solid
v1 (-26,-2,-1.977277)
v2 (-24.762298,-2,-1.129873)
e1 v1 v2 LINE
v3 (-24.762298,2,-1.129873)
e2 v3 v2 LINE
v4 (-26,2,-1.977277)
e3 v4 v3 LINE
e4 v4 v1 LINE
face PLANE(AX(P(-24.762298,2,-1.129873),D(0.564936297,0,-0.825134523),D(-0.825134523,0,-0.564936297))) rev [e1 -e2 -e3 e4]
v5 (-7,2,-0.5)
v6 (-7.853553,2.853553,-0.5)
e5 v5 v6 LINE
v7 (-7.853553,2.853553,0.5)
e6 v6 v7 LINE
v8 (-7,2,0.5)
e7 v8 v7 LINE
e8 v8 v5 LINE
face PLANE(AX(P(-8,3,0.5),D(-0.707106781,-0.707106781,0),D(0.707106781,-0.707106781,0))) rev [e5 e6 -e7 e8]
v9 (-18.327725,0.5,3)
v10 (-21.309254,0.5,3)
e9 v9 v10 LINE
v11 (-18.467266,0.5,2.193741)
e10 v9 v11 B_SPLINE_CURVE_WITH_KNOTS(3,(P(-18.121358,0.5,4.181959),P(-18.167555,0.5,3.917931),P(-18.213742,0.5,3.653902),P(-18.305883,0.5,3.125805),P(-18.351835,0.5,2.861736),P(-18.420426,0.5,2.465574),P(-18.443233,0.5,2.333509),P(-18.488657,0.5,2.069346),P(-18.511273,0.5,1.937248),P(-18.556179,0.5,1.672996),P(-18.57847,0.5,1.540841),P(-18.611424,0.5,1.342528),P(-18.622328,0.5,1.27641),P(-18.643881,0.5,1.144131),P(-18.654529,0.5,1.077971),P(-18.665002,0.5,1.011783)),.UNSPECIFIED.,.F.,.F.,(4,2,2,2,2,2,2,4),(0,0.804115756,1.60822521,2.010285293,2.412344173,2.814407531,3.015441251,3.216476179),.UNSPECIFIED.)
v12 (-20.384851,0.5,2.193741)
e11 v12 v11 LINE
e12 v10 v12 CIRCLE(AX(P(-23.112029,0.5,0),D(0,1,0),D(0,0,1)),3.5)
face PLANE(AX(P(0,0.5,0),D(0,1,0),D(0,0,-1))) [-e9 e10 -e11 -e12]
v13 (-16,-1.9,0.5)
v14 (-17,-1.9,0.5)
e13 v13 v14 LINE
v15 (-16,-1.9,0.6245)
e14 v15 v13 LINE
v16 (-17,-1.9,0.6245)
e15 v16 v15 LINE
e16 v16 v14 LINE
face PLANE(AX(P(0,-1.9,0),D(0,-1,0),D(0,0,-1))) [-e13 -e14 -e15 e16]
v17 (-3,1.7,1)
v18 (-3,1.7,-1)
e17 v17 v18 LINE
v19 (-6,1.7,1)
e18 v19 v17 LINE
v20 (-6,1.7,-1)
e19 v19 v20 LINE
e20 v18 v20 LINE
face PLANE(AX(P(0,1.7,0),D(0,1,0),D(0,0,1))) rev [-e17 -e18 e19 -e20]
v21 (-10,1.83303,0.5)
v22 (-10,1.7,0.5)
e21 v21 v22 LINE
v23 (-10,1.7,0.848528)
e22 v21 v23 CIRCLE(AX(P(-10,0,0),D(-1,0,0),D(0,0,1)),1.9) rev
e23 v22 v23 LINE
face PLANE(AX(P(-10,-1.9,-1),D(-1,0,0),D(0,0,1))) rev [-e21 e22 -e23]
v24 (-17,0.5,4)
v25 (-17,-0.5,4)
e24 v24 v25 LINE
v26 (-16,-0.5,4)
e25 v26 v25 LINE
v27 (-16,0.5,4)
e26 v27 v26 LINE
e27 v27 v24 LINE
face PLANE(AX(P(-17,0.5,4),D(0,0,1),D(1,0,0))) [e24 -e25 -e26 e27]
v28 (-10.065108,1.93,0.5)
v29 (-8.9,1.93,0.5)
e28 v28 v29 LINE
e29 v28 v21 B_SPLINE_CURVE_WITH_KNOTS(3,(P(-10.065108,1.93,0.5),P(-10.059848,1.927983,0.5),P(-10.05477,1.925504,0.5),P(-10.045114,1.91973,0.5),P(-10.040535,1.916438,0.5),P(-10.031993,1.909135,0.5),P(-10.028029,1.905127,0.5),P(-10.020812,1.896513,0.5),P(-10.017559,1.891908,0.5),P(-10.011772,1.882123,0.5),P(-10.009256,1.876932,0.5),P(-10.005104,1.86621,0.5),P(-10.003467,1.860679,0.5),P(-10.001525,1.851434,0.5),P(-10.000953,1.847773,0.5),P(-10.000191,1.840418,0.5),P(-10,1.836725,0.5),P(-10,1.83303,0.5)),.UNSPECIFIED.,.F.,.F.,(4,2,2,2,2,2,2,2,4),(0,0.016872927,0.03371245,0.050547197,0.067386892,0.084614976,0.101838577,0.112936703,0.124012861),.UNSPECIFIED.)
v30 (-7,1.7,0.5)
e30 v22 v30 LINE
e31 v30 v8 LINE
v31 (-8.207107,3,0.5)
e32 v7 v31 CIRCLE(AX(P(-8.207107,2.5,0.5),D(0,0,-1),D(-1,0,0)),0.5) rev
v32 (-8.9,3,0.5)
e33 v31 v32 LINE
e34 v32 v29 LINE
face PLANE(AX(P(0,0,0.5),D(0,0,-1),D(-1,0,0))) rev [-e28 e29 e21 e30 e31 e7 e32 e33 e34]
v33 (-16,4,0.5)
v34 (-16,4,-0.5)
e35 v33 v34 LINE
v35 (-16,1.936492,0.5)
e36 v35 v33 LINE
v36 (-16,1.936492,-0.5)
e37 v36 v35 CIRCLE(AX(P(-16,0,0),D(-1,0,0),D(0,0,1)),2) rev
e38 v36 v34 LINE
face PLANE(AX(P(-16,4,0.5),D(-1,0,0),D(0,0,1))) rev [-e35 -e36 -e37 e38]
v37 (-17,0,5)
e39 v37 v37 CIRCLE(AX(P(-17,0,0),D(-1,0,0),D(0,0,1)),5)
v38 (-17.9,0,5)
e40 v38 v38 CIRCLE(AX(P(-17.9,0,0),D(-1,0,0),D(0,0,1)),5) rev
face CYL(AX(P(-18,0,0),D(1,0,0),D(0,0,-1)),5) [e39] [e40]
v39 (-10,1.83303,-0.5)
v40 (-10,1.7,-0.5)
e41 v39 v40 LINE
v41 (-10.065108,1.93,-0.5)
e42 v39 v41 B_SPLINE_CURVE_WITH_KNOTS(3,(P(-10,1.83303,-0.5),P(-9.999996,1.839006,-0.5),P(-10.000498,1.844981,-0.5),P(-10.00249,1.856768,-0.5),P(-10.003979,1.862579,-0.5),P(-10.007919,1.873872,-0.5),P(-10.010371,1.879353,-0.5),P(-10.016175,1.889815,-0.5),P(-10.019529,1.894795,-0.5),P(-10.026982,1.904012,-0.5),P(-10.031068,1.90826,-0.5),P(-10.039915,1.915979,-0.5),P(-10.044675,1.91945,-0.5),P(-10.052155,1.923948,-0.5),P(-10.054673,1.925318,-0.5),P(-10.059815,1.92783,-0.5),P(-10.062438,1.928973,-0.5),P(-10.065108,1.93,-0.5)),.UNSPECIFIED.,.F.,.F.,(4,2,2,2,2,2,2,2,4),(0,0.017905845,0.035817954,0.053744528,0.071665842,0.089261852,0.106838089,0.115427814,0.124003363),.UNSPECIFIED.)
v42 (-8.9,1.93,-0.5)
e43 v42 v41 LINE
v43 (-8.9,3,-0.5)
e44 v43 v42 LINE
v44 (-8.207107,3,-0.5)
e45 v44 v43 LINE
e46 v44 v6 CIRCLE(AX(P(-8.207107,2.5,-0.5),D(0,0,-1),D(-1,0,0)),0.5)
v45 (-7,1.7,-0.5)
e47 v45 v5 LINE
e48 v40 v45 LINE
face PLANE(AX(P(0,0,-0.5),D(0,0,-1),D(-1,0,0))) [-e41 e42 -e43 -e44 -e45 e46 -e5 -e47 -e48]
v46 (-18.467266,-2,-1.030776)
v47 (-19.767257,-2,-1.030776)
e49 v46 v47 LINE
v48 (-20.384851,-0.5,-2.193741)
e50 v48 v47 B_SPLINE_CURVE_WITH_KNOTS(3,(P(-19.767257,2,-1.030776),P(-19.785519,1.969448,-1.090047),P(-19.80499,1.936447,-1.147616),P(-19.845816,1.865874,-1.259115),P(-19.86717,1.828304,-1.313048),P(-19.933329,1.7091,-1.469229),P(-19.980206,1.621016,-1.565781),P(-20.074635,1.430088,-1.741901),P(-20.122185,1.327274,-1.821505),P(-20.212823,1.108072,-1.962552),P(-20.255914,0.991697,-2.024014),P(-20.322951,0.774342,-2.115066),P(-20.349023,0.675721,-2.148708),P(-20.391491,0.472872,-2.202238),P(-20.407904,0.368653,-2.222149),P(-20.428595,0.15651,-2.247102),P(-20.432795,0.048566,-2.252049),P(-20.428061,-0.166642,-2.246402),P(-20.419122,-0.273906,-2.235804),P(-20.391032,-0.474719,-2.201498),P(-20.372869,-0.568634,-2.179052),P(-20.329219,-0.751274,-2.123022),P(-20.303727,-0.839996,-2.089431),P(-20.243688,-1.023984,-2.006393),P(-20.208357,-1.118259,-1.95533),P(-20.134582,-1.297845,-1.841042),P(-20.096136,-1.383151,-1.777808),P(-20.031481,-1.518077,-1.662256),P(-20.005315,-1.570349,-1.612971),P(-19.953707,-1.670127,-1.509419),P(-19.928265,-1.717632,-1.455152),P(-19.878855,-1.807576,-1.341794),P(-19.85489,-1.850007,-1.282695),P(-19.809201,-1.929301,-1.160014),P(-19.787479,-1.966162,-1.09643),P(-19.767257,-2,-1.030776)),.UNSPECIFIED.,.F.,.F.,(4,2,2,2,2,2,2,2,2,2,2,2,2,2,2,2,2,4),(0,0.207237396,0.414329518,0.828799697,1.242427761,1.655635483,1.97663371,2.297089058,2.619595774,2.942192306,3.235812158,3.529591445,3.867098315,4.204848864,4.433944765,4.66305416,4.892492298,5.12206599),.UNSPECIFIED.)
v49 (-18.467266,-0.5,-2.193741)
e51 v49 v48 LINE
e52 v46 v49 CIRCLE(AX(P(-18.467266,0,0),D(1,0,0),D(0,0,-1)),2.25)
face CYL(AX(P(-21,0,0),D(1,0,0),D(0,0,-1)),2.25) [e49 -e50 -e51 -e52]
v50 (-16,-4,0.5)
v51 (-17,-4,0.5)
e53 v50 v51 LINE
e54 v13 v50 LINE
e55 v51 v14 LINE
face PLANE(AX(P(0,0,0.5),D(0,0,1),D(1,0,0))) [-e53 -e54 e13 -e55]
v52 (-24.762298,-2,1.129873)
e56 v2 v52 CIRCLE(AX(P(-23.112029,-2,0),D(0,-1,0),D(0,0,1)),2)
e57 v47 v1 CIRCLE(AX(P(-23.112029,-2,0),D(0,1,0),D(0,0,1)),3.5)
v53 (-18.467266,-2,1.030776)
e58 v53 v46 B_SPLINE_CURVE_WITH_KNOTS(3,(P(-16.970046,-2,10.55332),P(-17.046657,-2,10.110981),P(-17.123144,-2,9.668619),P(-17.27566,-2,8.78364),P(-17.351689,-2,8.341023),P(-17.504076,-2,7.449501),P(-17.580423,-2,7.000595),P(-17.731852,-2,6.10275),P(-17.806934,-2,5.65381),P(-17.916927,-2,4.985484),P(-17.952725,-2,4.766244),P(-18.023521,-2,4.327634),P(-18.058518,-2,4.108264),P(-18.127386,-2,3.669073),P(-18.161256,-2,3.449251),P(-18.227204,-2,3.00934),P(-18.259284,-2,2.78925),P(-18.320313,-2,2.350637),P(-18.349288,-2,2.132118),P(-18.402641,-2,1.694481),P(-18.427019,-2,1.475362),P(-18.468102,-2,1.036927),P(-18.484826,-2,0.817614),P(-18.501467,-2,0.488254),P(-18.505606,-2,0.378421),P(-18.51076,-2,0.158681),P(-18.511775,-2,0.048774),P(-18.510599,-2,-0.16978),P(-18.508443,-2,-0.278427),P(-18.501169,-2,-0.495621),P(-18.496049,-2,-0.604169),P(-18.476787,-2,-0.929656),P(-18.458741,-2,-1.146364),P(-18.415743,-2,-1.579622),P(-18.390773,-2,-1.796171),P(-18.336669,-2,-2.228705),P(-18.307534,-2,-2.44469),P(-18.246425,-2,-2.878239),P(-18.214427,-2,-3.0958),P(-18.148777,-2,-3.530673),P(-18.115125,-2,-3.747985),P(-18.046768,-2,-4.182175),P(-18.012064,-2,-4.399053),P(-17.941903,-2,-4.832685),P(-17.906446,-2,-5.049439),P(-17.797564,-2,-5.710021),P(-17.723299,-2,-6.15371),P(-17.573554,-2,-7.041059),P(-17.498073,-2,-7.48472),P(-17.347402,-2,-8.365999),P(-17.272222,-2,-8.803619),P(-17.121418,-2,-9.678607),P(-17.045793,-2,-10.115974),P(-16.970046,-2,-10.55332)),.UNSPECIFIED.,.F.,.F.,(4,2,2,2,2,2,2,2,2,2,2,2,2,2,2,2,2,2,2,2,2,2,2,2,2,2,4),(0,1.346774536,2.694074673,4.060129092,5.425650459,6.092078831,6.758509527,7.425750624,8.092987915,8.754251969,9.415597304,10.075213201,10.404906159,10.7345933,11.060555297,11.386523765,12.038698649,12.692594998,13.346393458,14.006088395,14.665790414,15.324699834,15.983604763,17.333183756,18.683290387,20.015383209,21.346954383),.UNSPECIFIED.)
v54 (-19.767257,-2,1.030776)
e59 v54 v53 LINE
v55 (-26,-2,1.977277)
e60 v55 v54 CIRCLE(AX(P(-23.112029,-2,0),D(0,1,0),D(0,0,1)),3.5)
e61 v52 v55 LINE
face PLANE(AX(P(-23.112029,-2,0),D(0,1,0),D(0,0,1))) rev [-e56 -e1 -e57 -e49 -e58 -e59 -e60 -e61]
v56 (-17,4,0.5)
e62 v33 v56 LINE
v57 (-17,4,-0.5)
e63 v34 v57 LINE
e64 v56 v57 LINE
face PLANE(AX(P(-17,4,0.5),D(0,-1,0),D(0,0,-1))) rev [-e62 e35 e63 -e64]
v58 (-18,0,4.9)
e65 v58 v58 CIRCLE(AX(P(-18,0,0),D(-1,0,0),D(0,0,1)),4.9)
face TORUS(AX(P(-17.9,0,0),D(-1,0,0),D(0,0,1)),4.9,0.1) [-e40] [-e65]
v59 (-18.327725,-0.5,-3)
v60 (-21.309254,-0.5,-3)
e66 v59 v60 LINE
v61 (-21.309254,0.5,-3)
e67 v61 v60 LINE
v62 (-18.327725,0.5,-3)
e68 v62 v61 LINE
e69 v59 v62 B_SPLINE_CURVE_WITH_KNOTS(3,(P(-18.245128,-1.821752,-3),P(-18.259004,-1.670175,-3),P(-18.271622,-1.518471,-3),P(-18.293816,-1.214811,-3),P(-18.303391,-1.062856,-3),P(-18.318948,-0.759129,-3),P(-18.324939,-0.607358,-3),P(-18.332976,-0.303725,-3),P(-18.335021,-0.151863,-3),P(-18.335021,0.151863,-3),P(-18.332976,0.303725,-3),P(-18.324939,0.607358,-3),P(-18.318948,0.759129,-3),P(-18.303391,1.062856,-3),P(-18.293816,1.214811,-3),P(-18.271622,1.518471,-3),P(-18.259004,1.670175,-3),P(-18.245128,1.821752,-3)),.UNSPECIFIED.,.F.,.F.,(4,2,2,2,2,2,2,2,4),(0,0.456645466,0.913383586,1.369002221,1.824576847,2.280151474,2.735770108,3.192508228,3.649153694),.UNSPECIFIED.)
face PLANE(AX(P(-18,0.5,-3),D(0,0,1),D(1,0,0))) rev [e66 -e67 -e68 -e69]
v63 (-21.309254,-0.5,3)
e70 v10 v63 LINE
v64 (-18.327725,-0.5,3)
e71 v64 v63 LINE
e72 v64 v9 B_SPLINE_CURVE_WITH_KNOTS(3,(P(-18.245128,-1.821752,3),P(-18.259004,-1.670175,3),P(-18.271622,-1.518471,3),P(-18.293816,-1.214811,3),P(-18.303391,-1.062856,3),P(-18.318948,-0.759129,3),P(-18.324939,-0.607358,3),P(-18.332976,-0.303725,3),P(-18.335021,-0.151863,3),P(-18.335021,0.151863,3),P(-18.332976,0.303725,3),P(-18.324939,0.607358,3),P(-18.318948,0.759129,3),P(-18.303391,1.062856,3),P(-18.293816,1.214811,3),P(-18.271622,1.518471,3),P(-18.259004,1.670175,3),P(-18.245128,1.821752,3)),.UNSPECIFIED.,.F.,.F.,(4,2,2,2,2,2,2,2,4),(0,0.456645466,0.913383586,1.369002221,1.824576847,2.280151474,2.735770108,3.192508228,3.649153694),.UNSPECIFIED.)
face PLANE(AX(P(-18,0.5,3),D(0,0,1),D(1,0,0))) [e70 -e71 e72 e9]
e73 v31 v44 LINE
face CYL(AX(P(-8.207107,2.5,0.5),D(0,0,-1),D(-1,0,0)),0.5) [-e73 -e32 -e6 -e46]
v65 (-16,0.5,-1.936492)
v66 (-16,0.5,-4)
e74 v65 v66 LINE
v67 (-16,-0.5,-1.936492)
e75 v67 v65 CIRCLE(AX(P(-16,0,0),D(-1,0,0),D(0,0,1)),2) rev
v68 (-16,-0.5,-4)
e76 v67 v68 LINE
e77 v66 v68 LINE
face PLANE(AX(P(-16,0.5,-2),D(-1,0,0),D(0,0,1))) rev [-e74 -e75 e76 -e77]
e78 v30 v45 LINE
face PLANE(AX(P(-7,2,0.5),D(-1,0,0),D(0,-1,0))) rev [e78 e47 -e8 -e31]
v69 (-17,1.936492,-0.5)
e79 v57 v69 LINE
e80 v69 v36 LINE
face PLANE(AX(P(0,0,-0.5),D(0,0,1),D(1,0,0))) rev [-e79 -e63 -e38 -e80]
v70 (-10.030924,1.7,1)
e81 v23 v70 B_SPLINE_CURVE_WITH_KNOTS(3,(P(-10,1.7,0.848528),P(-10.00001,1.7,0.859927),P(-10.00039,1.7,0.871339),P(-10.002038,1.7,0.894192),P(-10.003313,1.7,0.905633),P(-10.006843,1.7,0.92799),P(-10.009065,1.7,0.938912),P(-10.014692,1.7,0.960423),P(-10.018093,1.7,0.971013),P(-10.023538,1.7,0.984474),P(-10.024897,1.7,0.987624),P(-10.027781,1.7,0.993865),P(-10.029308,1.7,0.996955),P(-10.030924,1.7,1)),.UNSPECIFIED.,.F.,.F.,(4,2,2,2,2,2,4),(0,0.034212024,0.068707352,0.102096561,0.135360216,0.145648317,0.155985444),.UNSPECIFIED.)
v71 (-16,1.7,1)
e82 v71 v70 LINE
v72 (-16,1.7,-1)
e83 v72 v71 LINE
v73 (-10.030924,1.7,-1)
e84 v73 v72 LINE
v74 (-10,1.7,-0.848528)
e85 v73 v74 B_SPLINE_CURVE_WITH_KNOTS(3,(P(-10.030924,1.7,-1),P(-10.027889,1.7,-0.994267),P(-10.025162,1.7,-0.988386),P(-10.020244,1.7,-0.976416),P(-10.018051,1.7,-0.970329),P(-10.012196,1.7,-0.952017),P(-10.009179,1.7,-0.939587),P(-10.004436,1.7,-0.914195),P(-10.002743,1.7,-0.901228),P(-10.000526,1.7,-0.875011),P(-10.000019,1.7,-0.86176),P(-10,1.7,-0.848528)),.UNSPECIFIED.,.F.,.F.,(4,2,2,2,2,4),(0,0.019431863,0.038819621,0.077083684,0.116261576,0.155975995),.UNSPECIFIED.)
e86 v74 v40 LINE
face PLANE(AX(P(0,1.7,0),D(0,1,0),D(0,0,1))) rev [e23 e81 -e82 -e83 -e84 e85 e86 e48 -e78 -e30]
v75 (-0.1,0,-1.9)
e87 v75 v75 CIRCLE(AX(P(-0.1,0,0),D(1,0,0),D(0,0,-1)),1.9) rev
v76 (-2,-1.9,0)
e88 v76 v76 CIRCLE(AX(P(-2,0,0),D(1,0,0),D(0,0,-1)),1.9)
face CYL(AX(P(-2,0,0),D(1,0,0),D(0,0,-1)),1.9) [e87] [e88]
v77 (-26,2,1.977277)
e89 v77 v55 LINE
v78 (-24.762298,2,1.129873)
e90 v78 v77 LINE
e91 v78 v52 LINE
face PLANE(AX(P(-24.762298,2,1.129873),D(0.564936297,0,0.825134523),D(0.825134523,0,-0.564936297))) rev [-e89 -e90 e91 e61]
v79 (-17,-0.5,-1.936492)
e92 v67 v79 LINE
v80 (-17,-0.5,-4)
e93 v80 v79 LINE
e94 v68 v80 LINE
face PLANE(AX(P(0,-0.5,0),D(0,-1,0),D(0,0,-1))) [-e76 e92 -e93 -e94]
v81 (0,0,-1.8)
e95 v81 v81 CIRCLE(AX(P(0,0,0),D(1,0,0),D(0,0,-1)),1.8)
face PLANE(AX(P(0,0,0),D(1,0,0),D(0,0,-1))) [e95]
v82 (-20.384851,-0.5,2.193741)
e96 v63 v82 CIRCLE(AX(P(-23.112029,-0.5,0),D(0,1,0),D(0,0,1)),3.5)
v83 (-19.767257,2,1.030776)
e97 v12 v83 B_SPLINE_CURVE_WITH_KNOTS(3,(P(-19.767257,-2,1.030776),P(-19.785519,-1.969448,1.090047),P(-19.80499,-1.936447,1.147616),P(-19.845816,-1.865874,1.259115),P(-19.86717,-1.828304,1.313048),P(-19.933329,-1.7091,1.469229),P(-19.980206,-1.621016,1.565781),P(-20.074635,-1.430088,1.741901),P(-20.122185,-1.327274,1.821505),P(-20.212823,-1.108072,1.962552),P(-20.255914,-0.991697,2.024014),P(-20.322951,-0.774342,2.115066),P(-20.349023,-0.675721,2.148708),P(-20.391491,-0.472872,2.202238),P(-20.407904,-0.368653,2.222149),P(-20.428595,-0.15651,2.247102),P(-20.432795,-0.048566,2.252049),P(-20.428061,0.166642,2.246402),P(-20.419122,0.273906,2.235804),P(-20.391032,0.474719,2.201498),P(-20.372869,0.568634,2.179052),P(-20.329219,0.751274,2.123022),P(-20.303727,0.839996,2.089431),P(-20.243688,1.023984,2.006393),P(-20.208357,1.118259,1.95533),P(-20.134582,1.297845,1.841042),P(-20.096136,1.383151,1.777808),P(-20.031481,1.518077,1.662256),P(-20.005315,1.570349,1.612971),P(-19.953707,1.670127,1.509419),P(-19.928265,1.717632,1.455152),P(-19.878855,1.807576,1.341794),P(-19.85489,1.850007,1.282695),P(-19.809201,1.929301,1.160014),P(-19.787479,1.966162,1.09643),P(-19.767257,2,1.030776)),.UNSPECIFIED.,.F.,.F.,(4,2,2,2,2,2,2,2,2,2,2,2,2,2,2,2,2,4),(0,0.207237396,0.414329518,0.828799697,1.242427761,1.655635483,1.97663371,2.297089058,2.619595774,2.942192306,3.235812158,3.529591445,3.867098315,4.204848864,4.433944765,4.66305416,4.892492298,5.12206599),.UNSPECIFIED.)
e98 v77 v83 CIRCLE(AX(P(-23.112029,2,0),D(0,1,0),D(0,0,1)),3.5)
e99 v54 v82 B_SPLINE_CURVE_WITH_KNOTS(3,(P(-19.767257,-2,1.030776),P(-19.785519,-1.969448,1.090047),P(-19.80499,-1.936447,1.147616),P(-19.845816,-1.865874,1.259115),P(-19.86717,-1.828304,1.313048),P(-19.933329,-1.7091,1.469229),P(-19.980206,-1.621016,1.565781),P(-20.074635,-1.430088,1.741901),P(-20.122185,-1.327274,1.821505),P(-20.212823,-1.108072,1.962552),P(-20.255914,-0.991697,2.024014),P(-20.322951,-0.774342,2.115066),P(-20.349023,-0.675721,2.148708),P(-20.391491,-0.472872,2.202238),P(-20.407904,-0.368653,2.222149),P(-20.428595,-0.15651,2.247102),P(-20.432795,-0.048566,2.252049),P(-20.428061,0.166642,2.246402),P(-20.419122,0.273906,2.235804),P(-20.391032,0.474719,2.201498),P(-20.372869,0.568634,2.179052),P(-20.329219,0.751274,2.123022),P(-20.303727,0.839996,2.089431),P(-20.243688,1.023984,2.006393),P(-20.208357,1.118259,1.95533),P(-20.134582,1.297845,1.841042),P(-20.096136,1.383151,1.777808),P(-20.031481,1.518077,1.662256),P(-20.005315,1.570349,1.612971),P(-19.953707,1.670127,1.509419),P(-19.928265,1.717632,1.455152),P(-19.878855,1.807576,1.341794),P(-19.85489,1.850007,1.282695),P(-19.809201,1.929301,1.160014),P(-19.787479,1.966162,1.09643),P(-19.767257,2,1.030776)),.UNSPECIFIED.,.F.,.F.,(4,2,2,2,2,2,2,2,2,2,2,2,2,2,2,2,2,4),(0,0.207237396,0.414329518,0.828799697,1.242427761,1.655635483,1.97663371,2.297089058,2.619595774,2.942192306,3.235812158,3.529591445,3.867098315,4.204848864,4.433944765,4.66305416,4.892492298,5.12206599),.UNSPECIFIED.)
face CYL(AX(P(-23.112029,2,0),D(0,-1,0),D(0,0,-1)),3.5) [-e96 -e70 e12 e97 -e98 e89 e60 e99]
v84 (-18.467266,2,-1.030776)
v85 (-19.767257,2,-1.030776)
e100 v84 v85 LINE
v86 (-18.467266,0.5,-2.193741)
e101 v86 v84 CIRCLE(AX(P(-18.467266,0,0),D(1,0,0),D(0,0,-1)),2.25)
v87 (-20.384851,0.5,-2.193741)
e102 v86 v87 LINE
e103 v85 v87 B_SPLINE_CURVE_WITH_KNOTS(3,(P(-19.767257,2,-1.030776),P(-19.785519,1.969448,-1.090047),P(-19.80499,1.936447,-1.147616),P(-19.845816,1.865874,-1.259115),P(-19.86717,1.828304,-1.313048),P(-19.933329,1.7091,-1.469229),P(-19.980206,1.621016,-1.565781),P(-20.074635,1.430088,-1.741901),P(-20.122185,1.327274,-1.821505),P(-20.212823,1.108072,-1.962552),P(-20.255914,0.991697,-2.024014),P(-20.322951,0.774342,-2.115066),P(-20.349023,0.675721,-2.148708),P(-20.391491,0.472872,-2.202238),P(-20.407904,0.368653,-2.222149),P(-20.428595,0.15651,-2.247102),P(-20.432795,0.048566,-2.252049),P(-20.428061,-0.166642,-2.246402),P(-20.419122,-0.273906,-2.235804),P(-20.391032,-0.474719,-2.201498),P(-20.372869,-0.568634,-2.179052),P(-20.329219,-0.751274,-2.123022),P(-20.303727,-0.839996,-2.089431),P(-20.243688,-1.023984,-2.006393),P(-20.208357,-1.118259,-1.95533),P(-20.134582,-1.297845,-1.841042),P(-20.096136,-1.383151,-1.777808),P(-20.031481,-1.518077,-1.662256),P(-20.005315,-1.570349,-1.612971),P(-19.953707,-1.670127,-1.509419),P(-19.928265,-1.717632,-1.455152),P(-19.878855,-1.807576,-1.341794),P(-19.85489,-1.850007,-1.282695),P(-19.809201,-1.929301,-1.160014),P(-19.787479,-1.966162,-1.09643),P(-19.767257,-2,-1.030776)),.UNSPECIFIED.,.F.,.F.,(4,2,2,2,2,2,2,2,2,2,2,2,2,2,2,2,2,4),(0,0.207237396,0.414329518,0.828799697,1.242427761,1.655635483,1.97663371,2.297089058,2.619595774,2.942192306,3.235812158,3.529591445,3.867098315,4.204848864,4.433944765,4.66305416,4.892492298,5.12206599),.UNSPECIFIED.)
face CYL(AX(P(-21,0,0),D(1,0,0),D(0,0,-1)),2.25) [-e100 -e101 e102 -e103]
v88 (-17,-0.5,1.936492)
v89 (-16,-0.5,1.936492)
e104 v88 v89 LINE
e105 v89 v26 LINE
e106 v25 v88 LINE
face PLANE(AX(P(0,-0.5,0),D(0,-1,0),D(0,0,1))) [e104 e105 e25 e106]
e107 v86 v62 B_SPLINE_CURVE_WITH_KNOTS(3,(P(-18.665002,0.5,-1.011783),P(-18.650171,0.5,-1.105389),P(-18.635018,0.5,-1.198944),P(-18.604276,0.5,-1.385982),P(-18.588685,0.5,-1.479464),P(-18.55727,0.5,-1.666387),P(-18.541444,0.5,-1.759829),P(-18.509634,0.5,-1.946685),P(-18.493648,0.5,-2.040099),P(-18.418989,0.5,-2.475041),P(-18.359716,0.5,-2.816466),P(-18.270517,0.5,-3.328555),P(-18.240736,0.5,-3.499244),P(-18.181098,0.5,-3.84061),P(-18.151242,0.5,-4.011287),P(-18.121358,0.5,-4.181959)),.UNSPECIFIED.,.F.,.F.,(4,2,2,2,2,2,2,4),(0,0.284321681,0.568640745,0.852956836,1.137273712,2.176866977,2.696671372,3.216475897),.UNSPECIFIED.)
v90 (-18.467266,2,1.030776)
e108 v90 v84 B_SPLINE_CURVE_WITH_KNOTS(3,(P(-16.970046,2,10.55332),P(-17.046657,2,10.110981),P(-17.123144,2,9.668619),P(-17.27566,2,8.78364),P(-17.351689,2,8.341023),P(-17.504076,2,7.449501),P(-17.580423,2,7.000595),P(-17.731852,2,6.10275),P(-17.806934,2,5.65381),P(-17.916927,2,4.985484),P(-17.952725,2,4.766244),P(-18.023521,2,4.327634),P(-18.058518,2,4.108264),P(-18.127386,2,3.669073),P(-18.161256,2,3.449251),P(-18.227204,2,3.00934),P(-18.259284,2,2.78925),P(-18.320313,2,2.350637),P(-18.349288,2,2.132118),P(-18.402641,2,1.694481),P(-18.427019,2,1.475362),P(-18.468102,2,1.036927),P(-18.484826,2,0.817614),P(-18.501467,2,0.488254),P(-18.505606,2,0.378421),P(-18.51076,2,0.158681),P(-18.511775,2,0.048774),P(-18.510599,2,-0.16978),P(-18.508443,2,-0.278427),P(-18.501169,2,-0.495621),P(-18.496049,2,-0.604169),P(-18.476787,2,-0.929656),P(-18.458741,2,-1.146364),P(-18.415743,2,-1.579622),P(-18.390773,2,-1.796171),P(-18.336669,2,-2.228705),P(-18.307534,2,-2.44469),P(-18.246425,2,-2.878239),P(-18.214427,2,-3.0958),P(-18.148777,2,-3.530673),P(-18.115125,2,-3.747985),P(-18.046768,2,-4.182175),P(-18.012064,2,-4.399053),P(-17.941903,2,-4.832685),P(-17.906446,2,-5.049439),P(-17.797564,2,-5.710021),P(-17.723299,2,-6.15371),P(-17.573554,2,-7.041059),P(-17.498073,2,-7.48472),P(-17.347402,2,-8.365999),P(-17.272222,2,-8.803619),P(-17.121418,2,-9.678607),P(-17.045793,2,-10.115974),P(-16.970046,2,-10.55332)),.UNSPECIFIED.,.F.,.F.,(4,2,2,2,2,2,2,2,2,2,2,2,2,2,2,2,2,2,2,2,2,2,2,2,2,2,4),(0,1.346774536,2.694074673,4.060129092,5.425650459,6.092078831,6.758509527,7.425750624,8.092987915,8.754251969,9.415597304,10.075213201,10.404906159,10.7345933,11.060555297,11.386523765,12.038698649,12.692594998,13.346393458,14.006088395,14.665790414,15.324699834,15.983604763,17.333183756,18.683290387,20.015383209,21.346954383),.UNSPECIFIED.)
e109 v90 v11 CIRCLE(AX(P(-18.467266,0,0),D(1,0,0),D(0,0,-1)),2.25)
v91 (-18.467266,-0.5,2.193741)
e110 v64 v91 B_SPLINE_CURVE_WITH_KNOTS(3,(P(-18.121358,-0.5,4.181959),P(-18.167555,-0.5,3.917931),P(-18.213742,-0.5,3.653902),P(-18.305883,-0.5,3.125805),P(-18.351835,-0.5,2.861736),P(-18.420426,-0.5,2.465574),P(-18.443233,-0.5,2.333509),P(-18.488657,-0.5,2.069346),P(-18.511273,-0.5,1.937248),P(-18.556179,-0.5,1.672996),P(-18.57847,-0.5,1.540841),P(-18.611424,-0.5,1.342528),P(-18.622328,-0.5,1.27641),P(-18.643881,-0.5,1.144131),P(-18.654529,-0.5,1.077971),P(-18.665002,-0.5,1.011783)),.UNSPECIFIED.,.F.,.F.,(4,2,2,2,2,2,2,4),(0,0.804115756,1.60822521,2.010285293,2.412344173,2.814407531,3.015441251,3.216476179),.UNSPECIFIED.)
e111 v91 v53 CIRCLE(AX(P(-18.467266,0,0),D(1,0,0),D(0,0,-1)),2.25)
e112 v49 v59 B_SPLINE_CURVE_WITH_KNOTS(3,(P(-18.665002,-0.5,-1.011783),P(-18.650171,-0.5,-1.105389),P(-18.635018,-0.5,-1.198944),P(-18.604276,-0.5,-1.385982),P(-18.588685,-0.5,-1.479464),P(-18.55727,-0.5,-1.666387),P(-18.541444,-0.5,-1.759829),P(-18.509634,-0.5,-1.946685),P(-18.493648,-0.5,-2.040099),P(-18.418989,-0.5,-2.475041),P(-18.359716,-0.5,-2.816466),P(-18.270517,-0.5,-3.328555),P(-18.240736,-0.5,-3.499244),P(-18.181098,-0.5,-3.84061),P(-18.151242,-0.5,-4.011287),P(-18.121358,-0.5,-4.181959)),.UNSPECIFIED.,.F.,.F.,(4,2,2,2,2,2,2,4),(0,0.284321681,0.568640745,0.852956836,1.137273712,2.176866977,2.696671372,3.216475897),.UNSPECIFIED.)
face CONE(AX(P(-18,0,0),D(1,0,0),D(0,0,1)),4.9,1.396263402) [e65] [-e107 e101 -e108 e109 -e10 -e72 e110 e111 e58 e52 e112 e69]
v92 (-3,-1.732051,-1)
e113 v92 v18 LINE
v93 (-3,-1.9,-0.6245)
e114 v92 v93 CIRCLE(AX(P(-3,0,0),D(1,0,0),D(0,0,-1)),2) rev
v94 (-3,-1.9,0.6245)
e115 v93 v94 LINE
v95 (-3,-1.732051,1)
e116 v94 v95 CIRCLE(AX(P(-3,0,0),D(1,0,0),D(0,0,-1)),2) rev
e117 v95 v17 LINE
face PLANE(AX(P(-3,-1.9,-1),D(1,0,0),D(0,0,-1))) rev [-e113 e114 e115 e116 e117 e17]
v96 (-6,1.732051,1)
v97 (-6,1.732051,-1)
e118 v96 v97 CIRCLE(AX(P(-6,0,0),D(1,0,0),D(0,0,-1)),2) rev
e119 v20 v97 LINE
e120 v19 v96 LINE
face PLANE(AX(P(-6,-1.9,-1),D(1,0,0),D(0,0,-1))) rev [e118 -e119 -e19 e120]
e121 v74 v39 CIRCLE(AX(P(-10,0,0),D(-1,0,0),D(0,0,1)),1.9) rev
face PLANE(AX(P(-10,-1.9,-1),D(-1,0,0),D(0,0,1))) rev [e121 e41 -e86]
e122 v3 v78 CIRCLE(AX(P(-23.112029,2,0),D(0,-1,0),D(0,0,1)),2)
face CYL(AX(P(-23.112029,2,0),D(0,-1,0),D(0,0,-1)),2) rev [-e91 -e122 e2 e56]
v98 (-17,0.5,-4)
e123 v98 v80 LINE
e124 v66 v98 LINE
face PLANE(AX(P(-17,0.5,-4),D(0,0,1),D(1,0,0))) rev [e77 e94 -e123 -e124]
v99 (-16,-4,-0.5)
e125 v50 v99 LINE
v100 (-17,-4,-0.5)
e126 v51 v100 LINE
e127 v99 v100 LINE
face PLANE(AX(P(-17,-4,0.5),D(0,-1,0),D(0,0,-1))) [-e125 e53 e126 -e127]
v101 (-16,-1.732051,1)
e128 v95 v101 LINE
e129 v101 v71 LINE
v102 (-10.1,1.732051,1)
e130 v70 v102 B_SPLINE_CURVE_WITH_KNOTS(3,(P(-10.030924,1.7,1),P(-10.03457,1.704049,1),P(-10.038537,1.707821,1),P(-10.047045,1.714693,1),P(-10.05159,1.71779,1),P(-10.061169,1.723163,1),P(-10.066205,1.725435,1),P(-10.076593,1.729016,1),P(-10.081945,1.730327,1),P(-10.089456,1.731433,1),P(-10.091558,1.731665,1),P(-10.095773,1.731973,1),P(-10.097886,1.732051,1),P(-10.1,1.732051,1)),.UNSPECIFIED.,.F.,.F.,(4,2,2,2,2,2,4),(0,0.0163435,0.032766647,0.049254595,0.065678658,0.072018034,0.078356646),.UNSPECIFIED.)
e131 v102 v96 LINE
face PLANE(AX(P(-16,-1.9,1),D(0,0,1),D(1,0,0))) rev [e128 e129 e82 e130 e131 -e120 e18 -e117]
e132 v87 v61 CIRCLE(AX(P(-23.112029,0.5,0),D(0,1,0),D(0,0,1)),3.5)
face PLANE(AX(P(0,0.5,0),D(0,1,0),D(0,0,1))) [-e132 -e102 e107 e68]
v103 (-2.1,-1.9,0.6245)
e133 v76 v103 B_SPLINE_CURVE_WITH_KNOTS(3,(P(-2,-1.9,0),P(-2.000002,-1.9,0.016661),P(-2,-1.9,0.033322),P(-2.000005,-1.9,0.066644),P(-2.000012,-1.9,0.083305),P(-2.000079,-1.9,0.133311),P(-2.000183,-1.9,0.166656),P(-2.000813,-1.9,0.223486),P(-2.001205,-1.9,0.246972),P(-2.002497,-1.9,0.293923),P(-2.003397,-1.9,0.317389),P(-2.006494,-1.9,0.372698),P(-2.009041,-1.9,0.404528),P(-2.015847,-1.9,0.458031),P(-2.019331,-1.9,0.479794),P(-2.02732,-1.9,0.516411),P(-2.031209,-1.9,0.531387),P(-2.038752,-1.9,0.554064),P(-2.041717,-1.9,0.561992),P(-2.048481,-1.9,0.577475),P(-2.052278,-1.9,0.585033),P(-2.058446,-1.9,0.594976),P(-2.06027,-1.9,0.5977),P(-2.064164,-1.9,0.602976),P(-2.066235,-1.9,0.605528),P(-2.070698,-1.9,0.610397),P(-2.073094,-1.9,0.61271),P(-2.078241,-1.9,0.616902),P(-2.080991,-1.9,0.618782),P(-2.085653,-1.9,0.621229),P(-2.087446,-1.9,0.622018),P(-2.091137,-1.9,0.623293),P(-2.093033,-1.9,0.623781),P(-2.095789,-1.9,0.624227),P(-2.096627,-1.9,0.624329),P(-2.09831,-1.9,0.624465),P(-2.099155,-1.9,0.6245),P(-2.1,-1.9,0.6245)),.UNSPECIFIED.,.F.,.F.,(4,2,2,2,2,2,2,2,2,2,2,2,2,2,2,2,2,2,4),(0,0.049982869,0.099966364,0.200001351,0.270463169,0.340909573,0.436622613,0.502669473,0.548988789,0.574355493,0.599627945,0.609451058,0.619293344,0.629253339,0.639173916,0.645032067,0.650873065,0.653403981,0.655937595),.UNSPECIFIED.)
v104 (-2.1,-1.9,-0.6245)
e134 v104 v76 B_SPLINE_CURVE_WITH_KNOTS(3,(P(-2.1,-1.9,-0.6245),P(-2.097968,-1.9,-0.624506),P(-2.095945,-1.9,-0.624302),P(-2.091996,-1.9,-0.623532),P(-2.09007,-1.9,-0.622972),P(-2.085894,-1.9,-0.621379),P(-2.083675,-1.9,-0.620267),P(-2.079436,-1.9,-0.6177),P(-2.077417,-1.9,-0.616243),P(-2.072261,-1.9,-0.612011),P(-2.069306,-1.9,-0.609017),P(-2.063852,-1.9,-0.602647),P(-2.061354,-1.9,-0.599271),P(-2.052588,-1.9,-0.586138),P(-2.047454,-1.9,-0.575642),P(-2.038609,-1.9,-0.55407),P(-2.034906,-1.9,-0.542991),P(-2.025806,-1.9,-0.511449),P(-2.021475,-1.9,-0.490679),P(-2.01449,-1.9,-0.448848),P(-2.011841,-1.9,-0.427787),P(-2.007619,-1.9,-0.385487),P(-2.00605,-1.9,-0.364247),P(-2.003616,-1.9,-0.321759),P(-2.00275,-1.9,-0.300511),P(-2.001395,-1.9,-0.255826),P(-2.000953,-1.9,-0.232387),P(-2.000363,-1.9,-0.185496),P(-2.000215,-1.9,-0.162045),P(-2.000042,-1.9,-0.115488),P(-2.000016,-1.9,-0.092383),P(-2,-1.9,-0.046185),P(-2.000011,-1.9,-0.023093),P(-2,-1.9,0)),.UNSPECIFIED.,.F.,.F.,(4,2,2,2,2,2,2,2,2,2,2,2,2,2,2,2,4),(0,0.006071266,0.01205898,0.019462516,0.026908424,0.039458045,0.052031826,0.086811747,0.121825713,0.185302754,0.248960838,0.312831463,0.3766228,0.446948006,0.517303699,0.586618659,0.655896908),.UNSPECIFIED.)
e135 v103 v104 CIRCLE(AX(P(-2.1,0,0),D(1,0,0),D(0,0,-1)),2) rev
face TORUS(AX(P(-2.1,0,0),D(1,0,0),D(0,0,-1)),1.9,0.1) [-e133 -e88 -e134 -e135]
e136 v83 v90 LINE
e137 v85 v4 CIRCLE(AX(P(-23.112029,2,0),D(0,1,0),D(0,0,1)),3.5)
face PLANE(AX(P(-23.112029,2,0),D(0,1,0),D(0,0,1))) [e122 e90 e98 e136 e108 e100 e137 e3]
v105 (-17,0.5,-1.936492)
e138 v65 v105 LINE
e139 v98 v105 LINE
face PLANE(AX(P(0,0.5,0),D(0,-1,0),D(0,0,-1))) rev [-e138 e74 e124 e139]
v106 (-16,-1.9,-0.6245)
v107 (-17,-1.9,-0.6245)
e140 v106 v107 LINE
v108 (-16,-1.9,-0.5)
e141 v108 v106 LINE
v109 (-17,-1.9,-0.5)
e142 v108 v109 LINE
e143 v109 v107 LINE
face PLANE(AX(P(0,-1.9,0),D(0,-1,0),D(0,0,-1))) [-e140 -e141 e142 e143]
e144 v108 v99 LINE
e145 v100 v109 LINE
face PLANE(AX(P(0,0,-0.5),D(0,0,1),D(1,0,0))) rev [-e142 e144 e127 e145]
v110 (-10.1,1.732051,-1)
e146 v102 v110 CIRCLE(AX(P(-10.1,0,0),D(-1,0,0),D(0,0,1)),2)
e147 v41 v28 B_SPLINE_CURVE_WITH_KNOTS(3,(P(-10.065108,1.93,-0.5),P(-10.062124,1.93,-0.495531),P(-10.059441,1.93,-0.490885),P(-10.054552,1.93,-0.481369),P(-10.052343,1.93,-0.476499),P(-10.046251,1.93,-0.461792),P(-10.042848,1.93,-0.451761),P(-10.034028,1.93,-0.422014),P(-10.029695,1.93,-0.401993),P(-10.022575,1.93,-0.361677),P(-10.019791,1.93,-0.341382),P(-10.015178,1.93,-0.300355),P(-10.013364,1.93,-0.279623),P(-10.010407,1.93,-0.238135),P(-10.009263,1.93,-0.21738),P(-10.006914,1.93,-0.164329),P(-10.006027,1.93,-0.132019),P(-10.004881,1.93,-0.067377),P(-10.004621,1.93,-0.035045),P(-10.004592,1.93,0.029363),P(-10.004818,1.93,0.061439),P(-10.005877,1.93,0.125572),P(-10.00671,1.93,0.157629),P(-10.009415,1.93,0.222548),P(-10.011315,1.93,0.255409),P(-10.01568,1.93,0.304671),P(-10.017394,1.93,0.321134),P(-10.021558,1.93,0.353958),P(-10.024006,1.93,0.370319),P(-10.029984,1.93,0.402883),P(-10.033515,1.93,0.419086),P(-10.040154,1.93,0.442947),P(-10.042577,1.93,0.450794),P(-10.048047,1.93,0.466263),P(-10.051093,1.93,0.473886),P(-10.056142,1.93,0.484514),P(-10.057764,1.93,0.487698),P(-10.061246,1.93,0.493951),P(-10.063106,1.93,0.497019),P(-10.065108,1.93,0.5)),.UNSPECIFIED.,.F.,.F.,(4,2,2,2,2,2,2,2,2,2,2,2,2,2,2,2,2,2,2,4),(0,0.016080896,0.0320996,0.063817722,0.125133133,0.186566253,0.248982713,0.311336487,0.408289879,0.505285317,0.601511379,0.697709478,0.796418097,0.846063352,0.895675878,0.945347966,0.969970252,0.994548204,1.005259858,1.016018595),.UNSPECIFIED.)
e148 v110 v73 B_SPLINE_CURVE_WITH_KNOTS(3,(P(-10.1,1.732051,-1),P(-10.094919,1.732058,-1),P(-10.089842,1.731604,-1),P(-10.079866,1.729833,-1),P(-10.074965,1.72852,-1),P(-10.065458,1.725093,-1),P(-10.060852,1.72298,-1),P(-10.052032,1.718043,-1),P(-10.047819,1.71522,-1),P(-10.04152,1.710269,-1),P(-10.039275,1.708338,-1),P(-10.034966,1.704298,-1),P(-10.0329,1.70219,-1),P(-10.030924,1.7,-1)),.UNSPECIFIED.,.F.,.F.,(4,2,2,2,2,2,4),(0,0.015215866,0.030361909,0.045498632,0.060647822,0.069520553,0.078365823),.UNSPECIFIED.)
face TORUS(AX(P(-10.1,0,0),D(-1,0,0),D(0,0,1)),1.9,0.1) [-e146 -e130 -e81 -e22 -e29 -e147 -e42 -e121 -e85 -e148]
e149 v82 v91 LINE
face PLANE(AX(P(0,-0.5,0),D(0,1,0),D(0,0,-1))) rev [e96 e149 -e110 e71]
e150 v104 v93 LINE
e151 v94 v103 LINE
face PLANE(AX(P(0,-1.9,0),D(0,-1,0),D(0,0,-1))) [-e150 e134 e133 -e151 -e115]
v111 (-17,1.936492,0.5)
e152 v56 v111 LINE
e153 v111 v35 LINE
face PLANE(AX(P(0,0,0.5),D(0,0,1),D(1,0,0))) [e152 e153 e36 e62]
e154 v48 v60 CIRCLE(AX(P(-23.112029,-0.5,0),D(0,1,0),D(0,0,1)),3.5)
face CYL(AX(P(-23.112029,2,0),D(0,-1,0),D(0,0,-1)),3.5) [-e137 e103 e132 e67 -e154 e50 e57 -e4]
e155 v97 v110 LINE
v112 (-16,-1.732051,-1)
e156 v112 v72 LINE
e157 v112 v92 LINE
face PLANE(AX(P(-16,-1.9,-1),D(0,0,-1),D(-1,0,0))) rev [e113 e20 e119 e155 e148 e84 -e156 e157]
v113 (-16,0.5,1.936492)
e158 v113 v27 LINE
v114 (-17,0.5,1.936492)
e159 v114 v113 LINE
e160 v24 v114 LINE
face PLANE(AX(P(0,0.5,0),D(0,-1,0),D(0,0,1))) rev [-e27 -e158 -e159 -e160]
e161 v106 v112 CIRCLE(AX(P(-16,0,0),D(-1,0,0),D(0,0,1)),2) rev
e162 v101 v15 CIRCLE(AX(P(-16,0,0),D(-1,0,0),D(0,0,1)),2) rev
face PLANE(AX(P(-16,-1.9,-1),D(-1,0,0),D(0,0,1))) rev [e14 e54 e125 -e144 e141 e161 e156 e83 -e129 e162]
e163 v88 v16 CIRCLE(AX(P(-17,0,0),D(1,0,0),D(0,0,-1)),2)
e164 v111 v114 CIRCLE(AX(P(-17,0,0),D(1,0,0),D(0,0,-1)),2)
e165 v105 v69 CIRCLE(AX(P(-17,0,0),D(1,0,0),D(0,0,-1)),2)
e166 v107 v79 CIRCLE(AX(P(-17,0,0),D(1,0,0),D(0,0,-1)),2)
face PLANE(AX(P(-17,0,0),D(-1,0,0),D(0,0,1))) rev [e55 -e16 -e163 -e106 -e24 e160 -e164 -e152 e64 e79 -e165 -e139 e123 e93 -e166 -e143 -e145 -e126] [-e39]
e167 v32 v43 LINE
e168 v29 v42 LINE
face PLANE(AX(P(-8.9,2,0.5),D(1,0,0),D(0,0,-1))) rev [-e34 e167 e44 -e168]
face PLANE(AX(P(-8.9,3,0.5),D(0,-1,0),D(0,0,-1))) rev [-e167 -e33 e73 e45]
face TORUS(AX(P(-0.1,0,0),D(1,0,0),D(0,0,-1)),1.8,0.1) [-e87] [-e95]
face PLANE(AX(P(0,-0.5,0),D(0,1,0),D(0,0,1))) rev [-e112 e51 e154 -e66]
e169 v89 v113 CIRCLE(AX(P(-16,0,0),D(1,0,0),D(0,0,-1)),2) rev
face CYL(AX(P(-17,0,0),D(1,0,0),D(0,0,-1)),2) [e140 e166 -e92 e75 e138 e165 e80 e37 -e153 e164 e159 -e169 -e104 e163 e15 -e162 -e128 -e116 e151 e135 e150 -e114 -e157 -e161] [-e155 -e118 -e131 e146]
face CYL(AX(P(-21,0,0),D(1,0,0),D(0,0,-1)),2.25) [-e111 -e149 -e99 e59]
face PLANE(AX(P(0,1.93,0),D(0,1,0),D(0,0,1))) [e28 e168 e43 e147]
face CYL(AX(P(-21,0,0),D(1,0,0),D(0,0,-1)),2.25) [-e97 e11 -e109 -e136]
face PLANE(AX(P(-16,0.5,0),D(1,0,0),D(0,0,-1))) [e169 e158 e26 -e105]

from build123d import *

# Parameters (mm, degrees)
SCHIZZO1_R                    = 2
ESTRUSIONE_ESTRUSIONE1_DEPTH  = 17
SCHIZZO2_OUTSIDE_W            = 9.584
SCHIZZO2_OUTSIDE_H            = 9.584
SCHIZZO2_OUTSIDE_R            = 1.9
TAGLIO_ESTRUSIONE1_DEPTH      = 2
SCHIZZO6_W                    = 15
SCHIZZO6_H                    = 4
TAGLIO_ESTRUSIONE3_DEPTH      = 0.1
TAGLIO_ESTRUSIONE4_DEPTH      = 1.7
TAGLIO_ESTRUSIONE4_DEPTH_BACK = 18.23368794
SCHIZZO5_W                    = 13
SCHIZZO5_H                    = 2
SCHIZZO7_W                    = 4
SCHIZZO7_H                    = 2
TAGLIO_ESTRUSIONE5_DEPTH      = 18.555910686
ESTRUSIONE_ESTRUSIONE2_DEPTH  = 0.5
TAGLIO_ESTRUSIONE6_DEPTH      = 0.07
ESTRUSIONE_ESTRUSIONE4_DEPTH  = 0.5
ESTRUSIONE_ESTRUSIONE5_DEPTH  = 0.5
SCHIZZO20_R                   = 5
ESTRUSIONE_ESTRUSIONE6_DEPTH  = 1
SCHIZZO23_R                   = 2.25
ESTRUSIONE_ESTRUSIONE7_DEPTH  = 3
ESTRUSIONE_ESTRUSIONE10_DEPTH = 2
ESTRUSIONE_ESTRUSIONE8_DEPTH  = 0.5
SCHIZZO35_W                   = 3
SCHIZZO35_H                   = 2.061552812
TAGLIO_ESTRUSIONE7_DEPTH      = 1
RACCORDO22_R                  = 0.5
RACCORDO23_R                  = 0.1
RACCORDO24_R                  = 0.1
RACCORDO25_R                  = 0.1
RACCORDO28_R                  = 0.1


# Some blends are built 0.0001 mm under size
with BuildPart() as part:
    # Schizzo1 → Estrusione-Estrusione1 (new body)
    with BuildSketch(Plane(origin=(0, 0, 0), x_dir=(0, 0, -1), z_dir=(1, 0, 0))):
        Circle(SCHIZZO1_R)
    extrude(amount=-ESTRUSIONE_ESTRUSIONE1_DEPTH)

    # Schizzo2 outside → Taglio-Estrusione1 (cut)
    with BuildSketch(Plane(origin=(0, 0, 0), x_dir=(0, 0, -1), z_dir=(1, 0, 0))):
        Rectangle(SCHIZZO2_OUTSIDE_W, SCHIZZO2_OUTSIDE_H)
        Circle(SCHIZZO2_OUTSIDE_R, mode=Mode.SUBTRACT)
    extrude(amount=-TAGLIO_ESTRUSIONE1_DEPTH, mode=Mode.SUBTRACT)

    # Schizzo6 → Taglio-Estrusione3 (cut)
    with BuildSketch(Plane(origin=(0, -2, 0), x_dir=(-1, 0, 0), z_dir=(0, -1, 0))):
        with Locations((9.5, 0)):
            Rectangle(SCHIZZO6_W, SCHIZZO6_H)
    extrude(amount=-TAGLIO_ESTRUSIONE3_DEPTH, mode=Mode.SUBTRACT)

    # Schizzo5 → Taglio-Estrusione4 (cut, two sides: drawn at the far end of the back side and taken through both)
    with BuildSketch(Plane(origin=(0, 0, 0), x_dir=(1, 0, 0), z_dir=(0, 1, 0)).offset(-TAGLIO_ESTRUSIONE4_DEPTH_BACK)):
        with Locations((-9.5, 0)):
            Rectangle(SCHIZZO5_W, SCHIZZO5_H)
    extrude(amount=TAGLIO_ESTRUSIONE4_DEPTH + TAGLIO_ESTRUSIONE4_DEPTH_BACK, mode=Mode.SUBTRACT)

    # Schizzo7 → Taglio-Estrusione5 (cut, through all)
    with BuildSketch(Plane(origin=(0, 2, 0), x_dir=(1, 0, 0), z_dir=(0, 1, 0))):
        with Locations((-8, 0)):
            Rectangle(SCHIZZO7_W, SCHIZZO7_H)
    extrude(amount=-TAGLIO_ESTRUSIONE5_DEPTH, mode=Mode.SUBTRACT)

    # Schizzo12 → Estrusione-Estrusione2 (add, symmetric)
    with BuildSketch(Plane.XY):
        Polygon((-10, 2), (-8.9, 2), (-8.9, 3), (-8, 3), (-7, 2), (-7, 1.7), (-10, 1.7), align=None)
    extrude(amount=ESTRUSIONE_ESTRUSIONE2_DEPTH, both=True)

    # Schizzo16 → Taglio-Estrusione6 (cut)
    with BuildSketch(Plane(origin=(0, 2, 0), x_dir=(1, 0, 0), z_dir=(0, 1, 0))):
        Polygon((-8.9, 0.5), (-10, 0.5), (-10, 0), (-10, -0.5), (-8.9, -0.5), align=None)
    extrude(amount=-TAGLIO_ESTRUSIONE6_DEPTH, mode=Mode.SUBTRACT)

    # Schizzo17 → Estrusione-Estrusione4 (add, symmetric)
    with BuildSketch(Plane.XY):
        Polygon((-17, 4), (-16, 4), (-16, 0.047058824), (-17, 0.05), align=None)
    estrusione_estrusione4 = extrude(amount=ESTRUSIONE_ESTRUSIONE4_DEPTH, both=True)

    # Specchia2: Estrusione-Estrusione4 across plane
    add(estrusione_estrusione4.mirror(Plane.ZX))

    # Schizzo19 → Estrusione-Estrusione5 (add, symmetric)
    with BuildSketch(Plane(origin=(0, 0, 0), x_dir=(1, 0, 0), z_dir=(0, 1, 0))):
        Polygon((-17, 2), (-17, 0), (-16, 0), (-16, 2), (-16, 4), (-17, 4), align=None)
    estrusione_estrusione5 = extrude(amount=ESTRUSIONE_ESTRUSIONE5_DEPTH, both=True)

    # Specchia5: Estrusione-Estrusione5 across plane
    add(estrusione_estrusione5.mirror(Plane.XY))

    # Schizzo20 → Estrusione-Estrusione6 (add)
    with BuildSketch(Plane.ZY.offset(17)):
        Circle(SCHIZZO20_R)
    extrude(amount=ESTRUSIONE_ESTRUSIONE6_DEPTH)

    # Schizzo23 → Estrusione-Estrusione7 (add)
    with BuildSketch(Plane.ZY.offset(18)):
        Circle(SCHIZZO23_R)
    extrude(amount=ESTRUSIONE_ESTRUSIONE7_DEPTH)

    # Schizzo22 → Estrusione-Estrusione10 (add, symmetric)
    with BuildSketch(Plane(origin=(0, 0, 0), x_dir=(1, 0, 0), z_dir=(0, 1, 0))):
        with BuildLine():
            Line((-24.762298216, -1.129872594), (-26, -1.977277039))
            ThreePointArc((-26, -1.977277039), (-19.612029171, 0), (-26, 1.977277039))
            Line((-26, 1.977277039), (-24.762298216, 1.129872594))
            ThreePointArc((-24.762298216, 1.129872594), (-21.112029171, 0), (-24.762298216, -1.129872594))
        make_face()
    extrude(amount=ESTRUSIONE_ESTRUSIONE10_DEPTH, both=True)

    # Schizzo34 → Estrusione-Estrusione8 (add, symmetric)
    with BuildSketch(Plane(origin=(0, 0, 0), x_dir=(1, 0, 0), z_dir=(0, 1, 0))):
        Polygon((-18, 3), (-21.309253533, 3), (-18, 0), align=None)
    estrusione_estrusione8 = extrude(amount=ESTRUSIONE_ESTRUSIONE8_DEPTH, both=True)

    # Specchia6: Estrusione-Estrusione8 across plane
    add(estrusione_estrusione8.mirror(Plane.XY))

    # Schizzo35 → Taglio-Estrusione7 (cut)
    with BuildSketch(Plane(origin=(0, 2, 0), x_dir=(1, 0, 0), z_dir=(0, 1, 0))):
        with Locations((-19.5, 0)):
            Rectangle(SCHIZZO35_W, SCHIZZO35_H)
    taglio_estrusione7 = extrude(amount=TAGLIO_ESTRUSIONE7_DEPTH, mode=Mode.SUBTRACT)

    # Specchia7: Taglio-Estrusione7 across plane
    add(taglio_estrusione7.mirror(Plane.ZX), mode=Mode.SUBTRACT)

    # Raccordo22
    raccordo22_edges = [part.edges().sort_by_distance(p)[0] for p in [
        (-8, 3, 0),
    ]]
    fillet(raccordo22_edges, radius=RACCORDO22_R)

    # Raccordo23
    raccordo23_edges = [part.edges().sort_by_distance(p)[0] for p in [
        (-2, 2, 0),
    ]]
    fillet(raccordo23_edges, radius=RACCORDO23_R - 0.0001)  # a hair under: the kernel refuses the full size

    # Raccordo24
    raccordo24_edges = [part.edges().sort_by_distance(p)[0] for p in [
        (0, 0, 1.9),
    ]]
    fillet(raccordo24_edges, radius=RACCORDO24_R)

    # Raccordo25
    raccordo25_edges = [part.edges().sort_by_distance(p)[0] for p in [
        (-18, 0, -5),
    ]]
    fillet(raccordo25_edges, radius=RACCORDO25_R)

    # Raccordo28
    # the kernel refuses this fillet: 0.1 mm, written as the material it takes off along each edge
    with BuildSketch(Plane(origin=(-10, 0, 0), x_dir=(0, 0.7969175395012055, 0.6040881022130338), z_dir=(0, -0.6040881022130338, 0.7969175395012055))) as raccordo28_piece_1_section:
        with BuildLine():
            CenterArc((2 - RACCORDO28_R, RACCORDO28_R), RACCORDO28_R, 270, 90)
            Line((2 - RACCORDO28_R, 0), (2, 0))
            Line((2, 0), (2, RACCORDO28_R))
        make_face()
    raccordo28_piece_1 = revolve(axis=Axis((-10, 0, 0), (-1, 0, 0)), revolution_arc=74.326501832, mode=Mode.PRIVATE)
    raccordo28_piece_1 = split(raccordo28_piece_1, bisect_by=Plane(origin=(-10.022414525, 1.819827674, 1), z_dir=(0, 0, -1)), keep=Keep.TOP, mode=Mode.PRIVATE)
    raccordo28_piece_1 = split(raccordo28_piece_1, bisect_by=Plane(origin=(-10.022414525, 1.819827674, 0.5), z_dir=(0, 0, 1)), keep=Keep.TOP, mode=Mode.PRIVATE)
    raccordo28_piece_1 = split(raccordo28_piece_1, bisect_by=Plane(origin=(-10.022414525, 1.93, 0.756995565), z_dir=(0, -1, 0)), keep=Keep.TOP, mode=Mode.PRIVATE)
    add(raccordo28_piece_1, mode=Mode.SUBTRACT)
    with BuildSketch(Plane(origin=(-10, 0, 0), x_dir=(0, 0.7969175395012055, 0.6040881022130338), z_dir=(0, -0.6040881022130338, 0.7969175395012055))) as raccordo28_piece_2_section:
        with BuildLine():
            CenterArc((2 - RACCORDO28_R, RACCORDO28_R), RACCORDO28_R, 270, 90)
            Line((2 - RACCORDO28_R, 0), (2, 0))
            Line((2, 0), (2, RACCORDO28_R))
        make_face()
    raccordo28_piece_2 = revolve(axis=Axis((-10, 0, 0), (-1, 0, 0)), revolution_arc=74.326501832, mode=Mode.PRIVATE)
    raccordo28_piece_2 = split(raccordo28_piece_2, bisect_by=Plane(origin=(-10.044225117, 1.932988234, 0.5), z_dir=(0, 0, 1)), keep=Keep.TOP, mode=Mode.PRIVATE)
    raccordo28_piece_2 = split(raccordo28_piece_2, bisect_by=Plane(origin=(-10.044225117, 1.93, 0.511192028), z_dir=(0, 1, 0)), keep=Keep.TOP, mode=Mode.PRIVATE)
    add(raccordo28_piece_2, mode=Mode.SUBTRACT)
    with BuildSketch(Plane(origin=(-10, 0, 0), x_dir=(0, 0.7969175395012055, 0.6040881022130338), z_dir=(0, -0.6040881022130338, 0.7969175395012055))) as raccordo28_piece_3_section:
        with BuildLine():
            CenterArc((2 - RACCORDO28_R, RACCORDO28_R), RACCORDO28_R, 270, 90)
            Line((2 - RACCORDO28_R, 0), (2, 0))
            Line((2, 0), (2, RACCORDO28_R))
        make_face()
    raccordo28_piece_3 = revolve(axis=Axis((-10, 0, 0), (-1, 0, 0)), revolution_arc=74.326501832, mode=Mode.PRIVATE)
    raccordo28_piece_3 = split(raccordo28_piece_3, bisect_by=Plane(origin=(-10.022414524, 1.819827674, -1), z_dir=(0, 0, 1)), keep=Keep.TOP, mode=Mode.PRIVATE)
    raccordo28_piece_3 = split(raccordo28_piece_3, bisect_by=Plane(origin=(-10.022414524, 1.93, -0.756995565), z_dir=(0, -1, 0)), keep=Keep.TOP, mode=Mode.PRIVATE)
    raccordo28_piece_3 = split(raccordo28_piece_3, bisect_by=Plane(origin=(-10.022414524, 1.819827674, -0.5), z_dir=(0, 0, -1)), keep=Keep.TOP, mode=Mode.PRIVATE)
    add(raccordo28_piece_3, mode=Mode.SUBTRACT)
    with BuildSketch(Plane(origin=(-10, 0, 0), x_dir=(0, 0.7969175395012055, 0.6040881022130338), z_dir=(0, -0.6040881022130338, 0.7969175395012055))) as raccordo28_piece_4_section:
        with BuildLine():
            CenterArc((2 - RACCORDO28_R, RACCORDO28_R), RACCORDO28_R, 270, 90)
            Line((2 - RACCORDO28_R, 0), (2, 0))
            Line((2, 0), (2, RACCORDO28_R))
        make_face()
    raccordo28_piece_4 = revolve(axis=Axis((-10, 0, 0), (-1, 0, 0)), revolution_arc=74.326501832, mode=Mode.PRIVATE)
    raccordo28_piece_4 = split(raccordo28_piece_4, bisect_by=Plane(origin=(-10.040080162, 1.981654904, 0.5), z_dir=(0, 0, -1)), keep=Keep.TOP, mode=Mode.PRIVATE)
    raccordo28_piece_4 = split(raccordo28_piece_4, bisect_by=Plane(origin=(-10.040080162, 1.93, 0), z_dir=(0, 1, 0)), keep=Keep.TOP, mode=Mode.PRIVATE)
    raccordo28_piece_4 = split(raccordo28_piece_4, bisect_by=Plane(origin=(-10.040080162, 1.981654904, -0.5), z_dir=(0, 0, 1)), keep=Keep.TOP, mode=Mode.PRIVATE)
    add(raccordo28_piece_4, mode=Mode.SUBTRACT)
    with BuildSketch(Plane(origin=(-10, 0, 0), x_dir=(0, 0.7969175395012055, 0.6040881022130338), z_dir=(0, -0.6040881022130338, 0.7969175395012055))) as raccordo28_piece_5_section:
        with BuildLine():
            CenterArc((2 - RACCORDO28_R, RACCORDO28_R), RACCORDO28_R, 270, 90)
            Line((2 - RACCORDO28_R, 0), (2, 0))
            Line((2, 0), (2, RACCORDO28_R))
        make_face()
    raccordo28_piece_5 = revolve(axis=Axis((-10, 0, 0), (-1, 0, 0)), revolution_arc=74.326501832, mode=Mode.PRIVATE)
    raccordo28_piece_5 = split(raccordo28_piece_5, bisect_by=Plane(origin=(-10.044225117, 1.93, -0.511192028), z_dir=(0, 1, 0)), keep=Keep.TOP, mode=Mode.PRIVATE)
    raccordo28_piece_5 = split(raccordo28_piece_5, bisect_by=Plane(origin=(-10.044225117, 1.932988234, -0.5), z_dir=(0, 0, -1)), keep=Keep.TOP, mode=Mode.PRIVATE)
    add(raccordo28_piece_5, mode=Mode.SUBTRACT)

    # Estrusione-Estrusione9 cone 1 section (through the dimple's axis) → Estrusione-Estrusione9 (revolve)
    with BuildSketch(Plane(origin=(-18, 0, 0), x_dir=(0, 0, -1), z_dir=(0, 1, 0))):
        Polygon((0, 0), (4.9, 0), (0, 0.864002205), align=None)
    revolve(axis=Axis((-18, 0, 0), (-1, 0, 0)))


solid = part.part
